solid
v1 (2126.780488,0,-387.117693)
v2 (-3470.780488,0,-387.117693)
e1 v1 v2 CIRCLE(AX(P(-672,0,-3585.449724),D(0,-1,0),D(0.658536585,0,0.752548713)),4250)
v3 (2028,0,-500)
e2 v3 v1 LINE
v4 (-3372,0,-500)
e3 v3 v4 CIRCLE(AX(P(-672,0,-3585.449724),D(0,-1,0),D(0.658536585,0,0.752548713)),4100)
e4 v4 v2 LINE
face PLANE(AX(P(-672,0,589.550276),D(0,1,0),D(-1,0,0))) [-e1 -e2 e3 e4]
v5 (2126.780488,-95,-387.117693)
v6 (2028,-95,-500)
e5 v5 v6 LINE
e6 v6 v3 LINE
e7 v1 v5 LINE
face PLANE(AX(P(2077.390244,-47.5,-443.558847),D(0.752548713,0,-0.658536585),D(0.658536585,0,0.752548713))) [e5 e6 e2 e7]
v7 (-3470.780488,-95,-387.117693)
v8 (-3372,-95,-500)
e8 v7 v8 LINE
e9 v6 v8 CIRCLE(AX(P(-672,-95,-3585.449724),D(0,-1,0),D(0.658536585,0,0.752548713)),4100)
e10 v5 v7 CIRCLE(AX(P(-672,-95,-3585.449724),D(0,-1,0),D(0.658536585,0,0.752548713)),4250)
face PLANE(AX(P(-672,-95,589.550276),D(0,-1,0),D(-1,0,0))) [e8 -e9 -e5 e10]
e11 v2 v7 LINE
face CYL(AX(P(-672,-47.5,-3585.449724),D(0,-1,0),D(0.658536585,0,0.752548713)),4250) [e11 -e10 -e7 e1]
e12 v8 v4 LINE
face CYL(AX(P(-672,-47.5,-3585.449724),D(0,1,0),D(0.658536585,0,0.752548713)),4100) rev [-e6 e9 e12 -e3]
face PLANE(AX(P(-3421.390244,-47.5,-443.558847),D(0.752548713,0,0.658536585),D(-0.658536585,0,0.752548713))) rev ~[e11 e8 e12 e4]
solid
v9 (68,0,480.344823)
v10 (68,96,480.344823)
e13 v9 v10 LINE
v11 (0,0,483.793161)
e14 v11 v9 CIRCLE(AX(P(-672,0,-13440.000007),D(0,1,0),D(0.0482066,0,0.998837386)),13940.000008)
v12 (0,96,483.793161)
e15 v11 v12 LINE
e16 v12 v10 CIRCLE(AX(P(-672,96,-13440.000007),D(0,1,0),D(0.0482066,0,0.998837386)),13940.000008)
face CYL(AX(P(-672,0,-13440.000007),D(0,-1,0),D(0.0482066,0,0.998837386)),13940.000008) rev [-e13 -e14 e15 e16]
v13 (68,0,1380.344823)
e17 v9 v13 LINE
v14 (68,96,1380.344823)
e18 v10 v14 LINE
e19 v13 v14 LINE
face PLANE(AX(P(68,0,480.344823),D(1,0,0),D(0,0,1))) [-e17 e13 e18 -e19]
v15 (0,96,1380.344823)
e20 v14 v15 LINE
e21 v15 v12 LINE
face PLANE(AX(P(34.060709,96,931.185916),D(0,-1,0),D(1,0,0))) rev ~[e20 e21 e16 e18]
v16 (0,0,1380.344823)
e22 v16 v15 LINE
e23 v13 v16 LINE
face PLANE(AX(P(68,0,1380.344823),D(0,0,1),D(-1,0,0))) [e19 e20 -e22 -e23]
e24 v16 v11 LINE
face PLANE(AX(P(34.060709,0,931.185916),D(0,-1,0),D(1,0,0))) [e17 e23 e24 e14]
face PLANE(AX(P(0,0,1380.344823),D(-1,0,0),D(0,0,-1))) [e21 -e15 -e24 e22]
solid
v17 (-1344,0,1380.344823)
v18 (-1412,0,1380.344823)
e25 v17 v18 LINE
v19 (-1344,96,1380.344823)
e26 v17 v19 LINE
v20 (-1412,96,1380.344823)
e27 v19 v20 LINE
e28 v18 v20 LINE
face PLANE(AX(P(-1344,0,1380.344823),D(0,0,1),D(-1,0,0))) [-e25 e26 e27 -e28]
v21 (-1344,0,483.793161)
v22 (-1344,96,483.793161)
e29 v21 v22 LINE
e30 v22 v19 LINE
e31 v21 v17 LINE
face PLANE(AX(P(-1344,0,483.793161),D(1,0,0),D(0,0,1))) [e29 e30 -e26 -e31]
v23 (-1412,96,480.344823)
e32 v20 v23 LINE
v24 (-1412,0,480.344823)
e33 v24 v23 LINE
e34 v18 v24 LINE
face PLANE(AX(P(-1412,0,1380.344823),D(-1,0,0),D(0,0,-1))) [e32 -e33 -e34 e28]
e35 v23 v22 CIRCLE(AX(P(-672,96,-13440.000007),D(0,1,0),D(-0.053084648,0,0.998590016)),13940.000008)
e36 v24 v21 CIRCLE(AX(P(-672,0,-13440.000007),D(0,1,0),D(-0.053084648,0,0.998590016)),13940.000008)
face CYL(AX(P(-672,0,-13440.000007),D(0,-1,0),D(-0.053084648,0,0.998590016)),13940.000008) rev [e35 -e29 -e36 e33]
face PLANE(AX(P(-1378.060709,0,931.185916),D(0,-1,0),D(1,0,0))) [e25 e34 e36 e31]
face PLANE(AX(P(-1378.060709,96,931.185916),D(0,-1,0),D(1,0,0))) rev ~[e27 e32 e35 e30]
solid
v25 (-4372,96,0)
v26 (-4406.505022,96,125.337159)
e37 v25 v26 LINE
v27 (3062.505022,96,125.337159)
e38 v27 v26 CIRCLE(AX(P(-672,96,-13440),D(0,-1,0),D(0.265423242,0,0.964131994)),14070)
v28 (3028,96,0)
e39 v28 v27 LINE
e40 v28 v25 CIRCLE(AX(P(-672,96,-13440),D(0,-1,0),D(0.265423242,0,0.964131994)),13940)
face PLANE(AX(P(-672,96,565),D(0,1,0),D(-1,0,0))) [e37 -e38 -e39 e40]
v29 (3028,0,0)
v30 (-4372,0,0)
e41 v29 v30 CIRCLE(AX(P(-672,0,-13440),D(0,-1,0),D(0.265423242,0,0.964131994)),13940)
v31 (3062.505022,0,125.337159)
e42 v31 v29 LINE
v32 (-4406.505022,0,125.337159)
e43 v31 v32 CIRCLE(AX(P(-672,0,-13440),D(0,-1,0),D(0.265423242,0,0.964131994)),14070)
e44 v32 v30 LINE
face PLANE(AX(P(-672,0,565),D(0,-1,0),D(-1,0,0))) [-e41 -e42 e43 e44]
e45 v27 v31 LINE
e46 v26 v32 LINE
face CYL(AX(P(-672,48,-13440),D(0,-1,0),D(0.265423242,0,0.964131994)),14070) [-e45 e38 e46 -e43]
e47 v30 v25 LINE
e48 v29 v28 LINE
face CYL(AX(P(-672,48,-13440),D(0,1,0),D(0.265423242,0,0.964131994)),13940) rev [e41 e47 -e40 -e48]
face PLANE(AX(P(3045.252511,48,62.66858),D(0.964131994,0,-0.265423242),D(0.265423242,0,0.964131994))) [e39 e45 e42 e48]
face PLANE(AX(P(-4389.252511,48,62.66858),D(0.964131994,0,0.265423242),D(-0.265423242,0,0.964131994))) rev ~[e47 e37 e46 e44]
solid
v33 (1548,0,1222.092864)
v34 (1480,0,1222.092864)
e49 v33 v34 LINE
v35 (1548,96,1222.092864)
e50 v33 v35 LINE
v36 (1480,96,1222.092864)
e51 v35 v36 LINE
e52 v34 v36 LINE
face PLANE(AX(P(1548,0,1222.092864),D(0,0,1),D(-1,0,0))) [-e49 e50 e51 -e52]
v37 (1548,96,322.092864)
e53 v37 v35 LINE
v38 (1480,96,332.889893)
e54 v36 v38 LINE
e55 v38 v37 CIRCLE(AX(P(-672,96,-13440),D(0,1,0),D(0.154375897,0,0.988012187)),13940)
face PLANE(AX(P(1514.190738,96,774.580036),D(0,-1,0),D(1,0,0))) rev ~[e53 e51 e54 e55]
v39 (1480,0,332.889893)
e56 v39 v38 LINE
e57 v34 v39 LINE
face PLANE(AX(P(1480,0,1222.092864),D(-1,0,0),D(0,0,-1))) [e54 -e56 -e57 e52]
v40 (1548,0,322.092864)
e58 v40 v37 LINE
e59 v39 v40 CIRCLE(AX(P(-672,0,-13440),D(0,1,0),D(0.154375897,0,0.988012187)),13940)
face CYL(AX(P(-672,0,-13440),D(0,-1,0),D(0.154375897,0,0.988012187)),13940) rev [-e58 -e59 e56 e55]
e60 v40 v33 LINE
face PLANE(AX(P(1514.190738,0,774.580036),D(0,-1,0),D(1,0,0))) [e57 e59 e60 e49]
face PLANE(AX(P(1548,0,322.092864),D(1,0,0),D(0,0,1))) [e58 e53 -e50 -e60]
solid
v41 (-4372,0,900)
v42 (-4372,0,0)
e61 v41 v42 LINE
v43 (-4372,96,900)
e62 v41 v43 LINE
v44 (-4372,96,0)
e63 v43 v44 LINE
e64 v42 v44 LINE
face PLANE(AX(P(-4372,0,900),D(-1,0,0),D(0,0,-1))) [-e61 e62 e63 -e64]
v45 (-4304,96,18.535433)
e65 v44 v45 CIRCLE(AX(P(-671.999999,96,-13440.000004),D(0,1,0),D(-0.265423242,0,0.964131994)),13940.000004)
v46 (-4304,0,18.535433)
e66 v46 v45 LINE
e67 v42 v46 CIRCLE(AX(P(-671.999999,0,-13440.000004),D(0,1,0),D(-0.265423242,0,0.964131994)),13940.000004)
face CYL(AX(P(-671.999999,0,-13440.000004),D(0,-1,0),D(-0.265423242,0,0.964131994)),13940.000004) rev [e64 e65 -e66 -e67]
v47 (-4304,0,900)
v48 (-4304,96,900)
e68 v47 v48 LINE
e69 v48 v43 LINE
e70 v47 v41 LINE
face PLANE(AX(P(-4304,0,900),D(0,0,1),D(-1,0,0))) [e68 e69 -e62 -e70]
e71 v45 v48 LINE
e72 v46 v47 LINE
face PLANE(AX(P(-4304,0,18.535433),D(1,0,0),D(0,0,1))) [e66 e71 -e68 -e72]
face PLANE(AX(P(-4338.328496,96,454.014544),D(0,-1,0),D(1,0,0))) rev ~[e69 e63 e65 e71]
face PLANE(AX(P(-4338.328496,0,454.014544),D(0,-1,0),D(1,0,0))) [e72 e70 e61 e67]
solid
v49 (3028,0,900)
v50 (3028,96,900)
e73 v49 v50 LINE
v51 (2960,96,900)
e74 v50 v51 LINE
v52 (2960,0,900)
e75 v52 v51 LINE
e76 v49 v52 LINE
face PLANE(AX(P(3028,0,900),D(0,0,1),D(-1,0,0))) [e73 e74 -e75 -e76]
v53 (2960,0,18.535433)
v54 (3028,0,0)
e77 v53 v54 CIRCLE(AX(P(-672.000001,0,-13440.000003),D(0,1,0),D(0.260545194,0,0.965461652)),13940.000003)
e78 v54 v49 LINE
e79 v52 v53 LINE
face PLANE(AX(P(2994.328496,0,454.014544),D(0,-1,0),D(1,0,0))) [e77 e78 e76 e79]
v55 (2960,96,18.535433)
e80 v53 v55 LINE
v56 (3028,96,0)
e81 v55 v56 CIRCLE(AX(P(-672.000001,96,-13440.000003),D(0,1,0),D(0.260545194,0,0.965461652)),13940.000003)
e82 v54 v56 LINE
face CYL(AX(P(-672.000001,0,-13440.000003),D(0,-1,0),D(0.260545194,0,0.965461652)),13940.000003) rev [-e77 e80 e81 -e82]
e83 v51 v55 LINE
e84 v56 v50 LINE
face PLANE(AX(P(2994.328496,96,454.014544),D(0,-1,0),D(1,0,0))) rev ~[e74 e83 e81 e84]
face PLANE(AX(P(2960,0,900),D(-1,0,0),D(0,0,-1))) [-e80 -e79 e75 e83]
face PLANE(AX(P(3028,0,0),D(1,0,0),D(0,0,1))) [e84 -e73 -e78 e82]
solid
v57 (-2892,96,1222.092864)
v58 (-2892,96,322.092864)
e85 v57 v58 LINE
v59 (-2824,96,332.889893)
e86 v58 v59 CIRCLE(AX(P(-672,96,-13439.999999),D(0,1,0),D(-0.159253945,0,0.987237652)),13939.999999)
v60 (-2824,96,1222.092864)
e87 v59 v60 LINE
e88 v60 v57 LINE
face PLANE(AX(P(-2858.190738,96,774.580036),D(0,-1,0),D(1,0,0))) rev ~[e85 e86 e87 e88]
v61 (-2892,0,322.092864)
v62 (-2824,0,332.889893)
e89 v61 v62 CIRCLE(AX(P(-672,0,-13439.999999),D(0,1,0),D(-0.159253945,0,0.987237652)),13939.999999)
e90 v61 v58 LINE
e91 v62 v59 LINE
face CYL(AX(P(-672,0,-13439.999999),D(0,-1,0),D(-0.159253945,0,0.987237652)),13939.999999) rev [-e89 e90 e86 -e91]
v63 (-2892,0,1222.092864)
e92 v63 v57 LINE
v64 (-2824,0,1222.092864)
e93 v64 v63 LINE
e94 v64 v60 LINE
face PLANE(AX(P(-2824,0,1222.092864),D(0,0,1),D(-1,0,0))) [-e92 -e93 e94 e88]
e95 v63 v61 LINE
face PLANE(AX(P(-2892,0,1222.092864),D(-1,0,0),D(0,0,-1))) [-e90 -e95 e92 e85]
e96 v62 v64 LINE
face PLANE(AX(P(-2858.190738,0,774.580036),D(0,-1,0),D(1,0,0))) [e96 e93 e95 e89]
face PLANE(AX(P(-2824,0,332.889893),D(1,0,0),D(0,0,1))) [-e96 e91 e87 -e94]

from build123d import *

# Parameters (mm, degrees)
F1_E7_W  = 150
F1_E7_H  = 95
F3_E9_W  = 130
F3_E9_H  = 96
F6_DEPTH = 96


with BuildPart() as f2:
    # F2: sweep along a path in F0
    with BuildLine(Plane.XZ) as f2_path:
        ThreePointArc((2028, -500), (-672, 514.5502758917), (-3372, -500))
    # F1_E7 (on explicit) → F2 (sweep)
    with BuildSketch(Plane(origin=(-3372, 0, -500), x_dir=(-0.6585365854, 0, 0.7525487132), z_dir=(0.7525487132, 0, 0.6585365854))):
        with Locations((75, 47.5)):
            Rectangle(F1_E7_W, F1_E7_H)
    sweep(path=f2_path.line)


with BuildPart() as f4:
    # F4: sweep along a path in F0
    with BuildLine(Plane.XZ) as f4_path:
        ThreePointArc((3028, 0), (-672, 500), (-4372, 0))
    # F3_E9 (on explicit) → F4 (sweep)
    with BuildSketch(Plane(origin=(-4372, 0, 0), x_dir=(-0.2654232425, 0, 0.9641319943), z_dir=(0.9641319943, 0, 0.2654232425))):
        with Locations((65, 48)):
            Rectangle(F3_E9_W, F3_E9_H)
    sweep(path=f4_path.line)


with BuildPart() as f4_1:
    # F5: moved
    add(f4.part.moved(Location((0, 96, 0))))


with BuildPart() as f6:
    # F0 (on Front) → F6 (new body)
    with BuildSketch(Plane.XZ):
        with BuildLine():
            Line((-4372, 900), (-4372, 0))
            ThreePointArc((-4372, 0), (-4338.0117144615, 9.3106927244), (-4304, 18.5354329511))
            Line((-4304, 18.5354329511), (-4304, 900))
            Line((-4304, 900), (-4372, 900))
        make_face()
    extrude(amount=-F6_DEPTH)


with BuildPart() as f6b:
    # F0 (on Front) → F6, piece 2 (new body)
    with BuildSketch(Plane.XZ):
        with BuildLine():
            Line((-2892, 1222.0928640959), (-2892, 322.0928640959))
            ThreePointArc((-2892, 322.0928640959), (-2858.0066660368, 327.5333613557), (-2824, 332.8898928293))
            Line((-2824, 332.8898928293), (-2824, 1222.0928640959))
            Line((-2824, 1222.0928640959), (-2892, 1222.0928640959))
        make_face()
    extrude(amount=-F6_DEPTH)


with BuildPart() as f6c:
    # F0 (on Front) → F6, piece 3 (new body)
    with BuildSketch(Plane.XZ):
        with BuildLine():
            ThreePointArc((-1412, 480.3448233153), (-1378.0021053501, 482.1105090874), (-1344, 483.793161348))
            Line((-1344, 483.793161348), (-1344, 1380.3448233153))
            Line((-1344, 1380.3448233153), (-1412, 1380.3448233153))
            Line((-1412, 1380.3448233153), (-1412, 480.3448233153))
        make_face()
    extrude(amount=-F6_DEPTH)


with BuildPart() as f6d:
    # F0 (on Front) → F6, piece 4 (new body)
    with BuildSketch(Plane.XZ):
        with BuildLine():
            Line((0, 1380.3448233152), (0, 483.793161348))
            ThreePointArc((0, 483.793161348), (34.0021053501, 482.1105090874), (68, 480.3448233153))
            Line((68, 480.3448233152), (68, 1380.3448233152))
            Line((68, 1380.3448233152), (0, 1380.3448233152))
        make_face()
    extrude(amount=-F6_DEPTH)


with BuildPart() as f6e:
    # F0 (on Front) → F6, piece 5 (new body)
    with BuildSketch(Plane.XZ):
        with BuildLine():
            ThreePointArc((1480, 332.8898928293), (1514.0066660368, 327.5333613557), (1548, 322.0928640959))
            Line((1548, 322.0928640959), (1548, 1222.0928640959))
            Line((1548, 1222.0928640959), (1480, 1222.0928640959))
            Line((1480, 1222.0928640959), (1480, 332.8898928293))
        make_face()
    extrude(amount=-F6_DEPTH)


with BuildPart() as f6f:
    # F0 (on Front) → F6, piece 6 (new body)
    with BuildSketch(Plane.XZ):
        with BuildLine():
            ThreePointArc((2960, 18.5354329511), (2994.0117144615, 9.3106927244), (3028, 0))
            Line((3028, 0), (3028, 900))
            Line((3028, 900), (2960, 900))
            Line((2960, 900), (2960, 18.5354329511))
        make_face()
    extrude(amount=-F6_DEPTH)


solid = Compound([f2.part, f4_1.part, f6.part, f6b.part, f6c.part, f6d.part, f6e.part, f6f.part])
